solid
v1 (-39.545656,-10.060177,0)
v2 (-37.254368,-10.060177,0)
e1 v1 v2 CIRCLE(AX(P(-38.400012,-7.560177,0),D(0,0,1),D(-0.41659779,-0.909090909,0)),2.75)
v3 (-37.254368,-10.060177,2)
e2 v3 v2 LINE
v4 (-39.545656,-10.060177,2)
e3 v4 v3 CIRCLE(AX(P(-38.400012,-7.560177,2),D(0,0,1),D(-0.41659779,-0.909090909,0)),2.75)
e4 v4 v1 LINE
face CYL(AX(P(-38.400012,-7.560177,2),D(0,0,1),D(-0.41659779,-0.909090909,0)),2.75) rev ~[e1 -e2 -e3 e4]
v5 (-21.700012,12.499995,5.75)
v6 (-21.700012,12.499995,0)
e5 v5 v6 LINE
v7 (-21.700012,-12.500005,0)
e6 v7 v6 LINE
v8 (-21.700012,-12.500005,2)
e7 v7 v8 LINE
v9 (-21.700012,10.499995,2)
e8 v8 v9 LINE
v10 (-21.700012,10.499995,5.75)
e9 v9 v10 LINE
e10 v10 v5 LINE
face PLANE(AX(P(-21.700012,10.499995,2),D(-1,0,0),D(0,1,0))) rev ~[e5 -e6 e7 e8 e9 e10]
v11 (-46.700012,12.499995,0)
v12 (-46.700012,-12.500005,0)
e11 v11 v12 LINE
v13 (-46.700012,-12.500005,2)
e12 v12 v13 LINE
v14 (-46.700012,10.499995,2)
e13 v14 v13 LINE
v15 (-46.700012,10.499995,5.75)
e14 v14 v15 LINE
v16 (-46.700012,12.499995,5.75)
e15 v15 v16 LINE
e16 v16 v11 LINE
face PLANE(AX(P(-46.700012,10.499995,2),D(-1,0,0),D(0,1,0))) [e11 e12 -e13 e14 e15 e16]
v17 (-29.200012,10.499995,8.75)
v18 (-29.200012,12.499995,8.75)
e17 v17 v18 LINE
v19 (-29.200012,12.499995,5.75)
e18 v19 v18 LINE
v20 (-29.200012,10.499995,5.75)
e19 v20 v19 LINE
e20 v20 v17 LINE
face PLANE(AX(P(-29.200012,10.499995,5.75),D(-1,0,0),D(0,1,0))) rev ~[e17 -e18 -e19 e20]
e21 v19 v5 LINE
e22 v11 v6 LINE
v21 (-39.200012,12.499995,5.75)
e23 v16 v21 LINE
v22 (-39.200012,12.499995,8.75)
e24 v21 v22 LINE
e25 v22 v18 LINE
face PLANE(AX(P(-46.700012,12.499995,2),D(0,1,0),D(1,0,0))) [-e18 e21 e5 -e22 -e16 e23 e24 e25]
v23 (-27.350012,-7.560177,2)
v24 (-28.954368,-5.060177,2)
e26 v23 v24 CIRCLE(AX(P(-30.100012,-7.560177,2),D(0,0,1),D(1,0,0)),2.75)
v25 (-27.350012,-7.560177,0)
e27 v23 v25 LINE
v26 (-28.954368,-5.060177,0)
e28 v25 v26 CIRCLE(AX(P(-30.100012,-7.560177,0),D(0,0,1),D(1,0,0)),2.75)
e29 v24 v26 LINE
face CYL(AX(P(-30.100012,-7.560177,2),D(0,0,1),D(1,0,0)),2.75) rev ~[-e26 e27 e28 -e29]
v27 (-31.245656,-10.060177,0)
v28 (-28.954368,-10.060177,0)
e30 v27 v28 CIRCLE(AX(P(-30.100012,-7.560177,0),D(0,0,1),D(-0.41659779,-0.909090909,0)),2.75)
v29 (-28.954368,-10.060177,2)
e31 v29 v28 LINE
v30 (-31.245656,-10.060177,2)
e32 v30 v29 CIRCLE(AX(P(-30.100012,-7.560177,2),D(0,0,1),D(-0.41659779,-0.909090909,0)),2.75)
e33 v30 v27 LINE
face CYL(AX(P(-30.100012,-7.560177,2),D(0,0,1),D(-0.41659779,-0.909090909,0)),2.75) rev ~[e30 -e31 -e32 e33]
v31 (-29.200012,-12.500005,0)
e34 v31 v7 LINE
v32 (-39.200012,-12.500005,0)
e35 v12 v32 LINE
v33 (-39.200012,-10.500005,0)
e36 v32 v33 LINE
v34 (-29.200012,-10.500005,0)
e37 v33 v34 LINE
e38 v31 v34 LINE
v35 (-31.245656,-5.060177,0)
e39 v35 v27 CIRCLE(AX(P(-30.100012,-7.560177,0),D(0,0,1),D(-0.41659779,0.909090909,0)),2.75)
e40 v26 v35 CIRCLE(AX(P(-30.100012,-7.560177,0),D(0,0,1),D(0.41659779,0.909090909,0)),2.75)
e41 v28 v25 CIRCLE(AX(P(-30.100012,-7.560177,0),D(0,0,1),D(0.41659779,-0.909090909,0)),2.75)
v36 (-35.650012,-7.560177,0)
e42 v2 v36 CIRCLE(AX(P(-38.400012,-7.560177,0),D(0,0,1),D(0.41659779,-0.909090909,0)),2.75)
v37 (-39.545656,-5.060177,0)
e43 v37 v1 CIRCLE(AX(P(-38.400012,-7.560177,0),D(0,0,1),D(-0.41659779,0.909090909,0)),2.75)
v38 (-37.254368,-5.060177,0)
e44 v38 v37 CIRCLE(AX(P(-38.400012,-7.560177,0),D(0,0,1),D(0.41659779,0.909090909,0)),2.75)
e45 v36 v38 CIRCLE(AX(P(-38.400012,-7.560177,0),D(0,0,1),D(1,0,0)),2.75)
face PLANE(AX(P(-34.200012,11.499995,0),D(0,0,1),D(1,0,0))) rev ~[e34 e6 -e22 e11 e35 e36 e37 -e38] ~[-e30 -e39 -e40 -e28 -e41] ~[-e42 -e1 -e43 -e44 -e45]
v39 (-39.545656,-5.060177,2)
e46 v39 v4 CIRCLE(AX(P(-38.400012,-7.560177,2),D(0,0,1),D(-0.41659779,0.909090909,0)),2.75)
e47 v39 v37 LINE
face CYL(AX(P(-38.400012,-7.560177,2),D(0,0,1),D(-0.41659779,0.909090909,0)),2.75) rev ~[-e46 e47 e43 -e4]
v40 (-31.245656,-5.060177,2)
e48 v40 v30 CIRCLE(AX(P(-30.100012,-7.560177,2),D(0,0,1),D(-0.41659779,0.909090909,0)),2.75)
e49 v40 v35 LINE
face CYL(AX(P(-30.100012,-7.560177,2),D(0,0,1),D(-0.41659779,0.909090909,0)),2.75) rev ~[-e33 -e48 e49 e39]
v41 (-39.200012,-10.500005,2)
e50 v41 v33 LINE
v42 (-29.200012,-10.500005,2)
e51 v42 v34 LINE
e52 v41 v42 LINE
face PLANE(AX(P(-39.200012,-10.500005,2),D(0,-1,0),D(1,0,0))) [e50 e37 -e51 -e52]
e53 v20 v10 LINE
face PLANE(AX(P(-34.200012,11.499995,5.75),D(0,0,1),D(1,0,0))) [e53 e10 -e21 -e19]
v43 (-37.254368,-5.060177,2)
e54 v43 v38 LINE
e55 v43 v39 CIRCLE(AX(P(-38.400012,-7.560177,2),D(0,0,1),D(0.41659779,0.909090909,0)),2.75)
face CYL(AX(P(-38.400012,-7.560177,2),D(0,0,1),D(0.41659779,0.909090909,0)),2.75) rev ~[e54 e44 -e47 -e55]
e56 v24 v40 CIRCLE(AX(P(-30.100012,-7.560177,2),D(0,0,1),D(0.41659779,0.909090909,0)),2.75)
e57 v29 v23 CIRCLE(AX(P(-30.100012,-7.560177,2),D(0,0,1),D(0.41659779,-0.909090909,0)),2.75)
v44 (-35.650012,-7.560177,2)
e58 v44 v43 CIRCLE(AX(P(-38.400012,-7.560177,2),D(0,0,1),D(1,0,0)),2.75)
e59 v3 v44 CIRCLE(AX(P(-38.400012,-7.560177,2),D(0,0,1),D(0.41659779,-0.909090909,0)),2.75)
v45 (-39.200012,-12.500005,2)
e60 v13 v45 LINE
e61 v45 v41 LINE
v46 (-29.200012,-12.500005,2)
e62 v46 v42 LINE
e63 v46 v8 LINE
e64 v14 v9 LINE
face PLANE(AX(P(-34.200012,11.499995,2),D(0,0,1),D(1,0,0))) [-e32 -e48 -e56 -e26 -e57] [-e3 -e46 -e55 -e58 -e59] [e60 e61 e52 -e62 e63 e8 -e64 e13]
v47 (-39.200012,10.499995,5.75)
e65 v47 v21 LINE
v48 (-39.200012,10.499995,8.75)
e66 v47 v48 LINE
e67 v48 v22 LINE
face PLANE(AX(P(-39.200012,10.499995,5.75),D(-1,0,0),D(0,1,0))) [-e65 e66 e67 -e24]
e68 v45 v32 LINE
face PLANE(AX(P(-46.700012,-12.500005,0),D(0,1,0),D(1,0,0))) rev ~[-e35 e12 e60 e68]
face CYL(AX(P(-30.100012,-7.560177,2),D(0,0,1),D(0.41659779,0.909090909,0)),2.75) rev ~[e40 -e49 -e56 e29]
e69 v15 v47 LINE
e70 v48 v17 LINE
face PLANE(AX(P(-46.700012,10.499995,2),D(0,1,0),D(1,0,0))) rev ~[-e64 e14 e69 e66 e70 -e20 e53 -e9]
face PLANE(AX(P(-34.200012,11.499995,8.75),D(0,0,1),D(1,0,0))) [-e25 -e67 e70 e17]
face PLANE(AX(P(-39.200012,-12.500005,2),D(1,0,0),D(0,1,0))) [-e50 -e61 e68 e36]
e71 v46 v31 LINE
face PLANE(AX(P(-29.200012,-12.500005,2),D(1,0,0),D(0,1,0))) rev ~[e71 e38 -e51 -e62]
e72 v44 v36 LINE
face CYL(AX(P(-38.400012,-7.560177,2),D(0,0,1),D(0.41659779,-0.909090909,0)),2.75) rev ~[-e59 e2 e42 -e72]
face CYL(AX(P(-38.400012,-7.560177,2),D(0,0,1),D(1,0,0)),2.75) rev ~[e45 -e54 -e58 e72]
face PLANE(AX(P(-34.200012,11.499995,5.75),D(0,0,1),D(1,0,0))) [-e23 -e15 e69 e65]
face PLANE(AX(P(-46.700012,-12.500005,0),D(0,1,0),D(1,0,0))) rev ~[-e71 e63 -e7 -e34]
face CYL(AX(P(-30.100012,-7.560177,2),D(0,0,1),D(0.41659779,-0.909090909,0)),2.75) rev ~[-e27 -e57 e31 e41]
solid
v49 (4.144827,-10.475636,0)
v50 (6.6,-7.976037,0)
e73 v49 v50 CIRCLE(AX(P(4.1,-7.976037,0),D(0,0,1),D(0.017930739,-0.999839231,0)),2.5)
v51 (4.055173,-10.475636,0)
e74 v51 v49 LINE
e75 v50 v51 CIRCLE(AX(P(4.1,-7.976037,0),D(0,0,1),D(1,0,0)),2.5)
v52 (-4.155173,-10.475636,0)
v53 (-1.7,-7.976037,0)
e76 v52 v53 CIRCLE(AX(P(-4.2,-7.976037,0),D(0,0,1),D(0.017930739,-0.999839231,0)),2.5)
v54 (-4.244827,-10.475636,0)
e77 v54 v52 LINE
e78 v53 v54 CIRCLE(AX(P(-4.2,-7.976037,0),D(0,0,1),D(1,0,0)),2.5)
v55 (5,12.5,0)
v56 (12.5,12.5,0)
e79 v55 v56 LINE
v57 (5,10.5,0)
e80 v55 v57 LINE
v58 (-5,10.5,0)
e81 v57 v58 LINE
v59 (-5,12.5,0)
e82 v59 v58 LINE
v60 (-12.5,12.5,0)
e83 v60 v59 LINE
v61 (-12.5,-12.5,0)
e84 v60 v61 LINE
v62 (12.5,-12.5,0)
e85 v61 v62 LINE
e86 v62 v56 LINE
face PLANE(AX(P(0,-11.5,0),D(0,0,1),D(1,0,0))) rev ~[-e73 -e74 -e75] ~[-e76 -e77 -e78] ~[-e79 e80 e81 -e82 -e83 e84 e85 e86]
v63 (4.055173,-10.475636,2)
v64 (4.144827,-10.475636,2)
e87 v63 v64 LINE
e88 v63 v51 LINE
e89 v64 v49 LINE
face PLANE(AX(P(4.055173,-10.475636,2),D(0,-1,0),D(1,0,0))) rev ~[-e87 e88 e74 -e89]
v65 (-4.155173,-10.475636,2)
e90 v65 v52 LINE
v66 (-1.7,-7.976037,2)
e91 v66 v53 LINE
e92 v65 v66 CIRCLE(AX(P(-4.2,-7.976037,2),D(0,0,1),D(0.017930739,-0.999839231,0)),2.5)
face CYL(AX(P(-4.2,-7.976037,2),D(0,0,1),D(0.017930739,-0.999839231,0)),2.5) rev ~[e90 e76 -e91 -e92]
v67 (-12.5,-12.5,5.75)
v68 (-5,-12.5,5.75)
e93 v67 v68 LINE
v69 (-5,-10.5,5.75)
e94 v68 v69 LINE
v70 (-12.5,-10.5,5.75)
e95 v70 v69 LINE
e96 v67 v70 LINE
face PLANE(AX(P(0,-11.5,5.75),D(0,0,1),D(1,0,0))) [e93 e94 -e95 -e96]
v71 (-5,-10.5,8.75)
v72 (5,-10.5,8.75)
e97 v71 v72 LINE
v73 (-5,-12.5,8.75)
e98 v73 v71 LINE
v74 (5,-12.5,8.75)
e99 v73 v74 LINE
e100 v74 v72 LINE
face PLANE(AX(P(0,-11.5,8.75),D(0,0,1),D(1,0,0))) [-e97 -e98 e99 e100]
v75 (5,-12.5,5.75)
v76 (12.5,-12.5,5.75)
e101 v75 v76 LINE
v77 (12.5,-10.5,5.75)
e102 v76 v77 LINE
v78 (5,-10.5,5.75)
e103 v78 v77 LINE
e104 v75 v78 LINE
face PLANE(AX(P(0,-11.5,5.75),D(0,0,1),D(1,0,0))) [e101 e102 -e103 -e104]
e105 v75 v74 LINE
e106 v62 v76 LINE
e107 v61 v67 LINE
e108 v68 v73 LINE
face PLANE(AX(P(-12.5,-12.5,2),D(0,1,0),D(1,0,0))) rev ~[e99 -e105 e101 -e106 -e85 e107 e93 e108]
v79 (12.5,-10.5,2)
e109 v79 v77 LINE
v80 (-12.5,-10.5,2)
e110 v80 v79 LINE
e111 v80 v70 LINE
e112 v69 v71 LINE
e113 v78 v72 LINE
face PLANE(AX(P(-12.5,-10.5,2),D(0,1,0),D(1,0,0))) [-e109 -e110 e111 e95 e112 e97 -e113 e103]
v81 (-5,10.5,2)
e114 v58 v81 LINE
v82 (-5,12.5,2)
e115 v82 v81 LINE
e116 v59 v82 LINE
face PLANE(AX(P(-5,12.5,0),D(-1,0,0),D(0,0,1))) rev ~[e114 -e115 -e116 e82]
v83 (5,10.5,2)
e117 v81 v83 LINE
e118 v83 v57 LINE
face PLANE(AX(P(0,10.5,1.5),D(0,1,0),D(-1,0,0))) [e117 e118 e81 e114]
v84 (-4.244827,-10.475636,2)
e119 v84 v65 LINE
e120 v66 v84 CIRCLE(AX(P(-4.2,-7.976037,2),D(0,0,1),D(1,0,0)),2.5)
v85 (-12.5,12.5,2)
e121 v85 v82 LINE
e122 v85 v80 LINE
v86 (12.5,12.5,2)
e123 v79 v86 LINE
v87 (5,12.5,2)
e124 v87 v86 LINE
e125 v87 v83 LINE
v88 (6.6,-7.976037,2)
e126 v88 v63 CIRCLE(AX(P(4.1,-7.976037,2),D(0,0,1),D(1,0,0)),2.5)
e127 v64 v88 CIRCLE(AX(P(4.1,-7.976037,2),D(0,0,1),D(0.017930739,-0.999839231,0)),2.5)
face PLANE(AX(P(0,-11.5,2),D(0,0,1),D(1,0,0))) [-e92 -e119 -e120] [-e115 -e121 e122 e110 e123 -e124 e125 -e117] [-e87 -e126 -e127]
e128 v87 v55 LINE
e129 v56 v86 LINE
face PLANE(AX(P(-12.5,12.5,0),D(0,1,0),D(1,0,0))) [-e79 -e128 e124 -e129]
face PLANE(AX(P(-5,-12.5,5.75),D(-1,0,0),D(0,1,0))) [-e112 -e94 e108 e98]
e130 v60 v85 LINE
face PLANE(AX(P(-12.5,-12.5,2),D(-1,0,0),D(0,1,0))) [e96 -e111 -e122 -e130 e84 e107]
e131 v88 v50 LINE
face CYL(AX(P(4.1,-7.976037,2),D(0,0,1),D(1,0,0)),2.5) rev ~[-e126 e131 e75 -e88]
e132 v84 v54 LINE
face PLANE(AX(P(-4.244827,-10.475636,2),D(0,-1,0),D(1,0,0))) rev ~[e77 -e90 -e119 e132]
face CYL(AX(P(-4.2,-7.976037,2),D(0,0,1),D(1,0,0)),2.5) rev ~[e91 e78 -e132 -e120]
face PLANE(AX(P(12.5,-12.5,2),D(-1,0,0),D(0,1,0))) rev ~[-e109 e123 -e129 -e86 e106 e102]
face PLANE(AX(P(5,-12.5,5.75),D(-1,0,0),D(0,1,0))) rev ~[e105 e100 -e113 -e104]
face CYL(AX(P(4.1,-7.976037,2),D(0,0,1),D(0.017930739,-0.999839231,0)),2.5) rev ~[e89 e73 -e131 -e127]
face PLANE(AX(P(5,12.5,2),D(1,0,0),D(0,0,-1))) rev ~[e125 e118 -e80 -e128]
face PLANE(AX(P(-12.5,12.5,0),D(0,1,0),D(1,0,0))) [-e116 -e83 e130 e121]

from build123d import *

# Parameters (mm, degrees)
F0_W      = 25
F0_H      = 2
F0_H_2    = 21
F1_DEPTH  = 2
F2_W      = 25
F2_H      = 2
F4_DEPTH  = 3.75
F3_W      = 25
F3_H      = 2
F5_W      = 10
F5_H      = 2
F7_DEPTH  = 2.001
F8_W      = 10
F8_H      = 2
F9_DEPTH  = 3
F10_W     = 10
F10_H     = 2
F11_DEPTH = 3
F13_DEPTH = 2
F15_DEPTH = 2.001
F17_DEPTH = 2.001


# Not quite as in the source:
# - a feature names something its author has since deleted; it is built from what else it names


with BuildPart() as f1:
    # F0 (on Top) → F1 (new body)
    with BuildSketch(Plane.XY):
        with Locations((-34.2000119388, 11.4999952018)):
            Rectangle(F0_W, F0_H)
        with Locations((-34.2000119388, -4.7982e-06)):
            Rectangle(F0_W, F0_H_2)
        with Locations((-34.2000119388, -11.5000047982)):
            Rectangle(F0_W, F0_H)
    extrude(amount=F1_DEPTH)

    # F2 (on face) → F4 (join)
    with BuildSketch(Plane.XY.offset(2)):
        with Locations((-34.2000119388, 11.4999952018)):
            Rectangle(F2_W, F2_H)
    extrude(amount=F4_DEPTH)

    # F5 (on face) → F7 (cut, through all)
    with BuildSketch(Plane.XY.offset(2)):
        with Locations((-34.2000119388, -11.5000047982)):
            Rectangle(F5_W, F5_H)
    extrude(amount=-F7_DEPTH, mode=Mode.SUBTRACT)

    # F8 (on face) → F9 (join)
    with BuildSketch(Plane.XY.offset(5.75)):
        with Locations((-34.2000119388, 11.4999952018)):
            Rectangle(F8_W, F8_H)
    extrude(amount=F9_DEPTH)

    # F16 (on face) → F17 (cut, through all)
    with BuildSketch(Plane.XY.offset(2)):
        with BuildLine():
            ThreePointArc((-39.5456558625, -5.0601771846), (-41.1500119388, -7.5601771846), (-39.5456558625, -10.0601771846))
            Line((-39.5456558625, -10.0601771846), (-37.2543680151, -10.0601771846))
            ThreePointArc((-37.2543680151, -10.0601771846), (-36.0855983208, -9.045434605), (-35.6500119388, -7.5601771846))
            ThreePointArc((-35.6500119388, -7.5601771846), (-36.0855983208, -6.0749197642), (-37.2543680151, -5.0601771846))
            Line((-37.2543680151, -5.0601771846), (-39.5456558625, -5.0601771846))
        make_face()
        with BuildLine():
            ThreePointArc((-37.2543680151, -5.0601771846), (-38.4000119388, -4.8101771846), (-39.5456558625, -5.0601771846))
            Line((-39.5456558625, -5.0601771846), (-37.2543680151, -5.0601771846))
        make_face()
        with BuildLine():
            Line((-37.2543680151, -10.0601771846), (-39.5456558625, -10.0601771846))
            ThreePointArc((-39.5456558625, -10.0601771846), (-38.4000119388, -10.3101771846), (-37.2543680151, -10.0601771846))
        make_face()
        with BuildLine():
            Line((-28.9543680151, -10.0601771846), (-31.2456558625, -10.0601771846))
            ThreePointArc((-31.2456558625, -10.0601771846), (-30.1000119388, -10.3101771846), (-28.9543680151, -10.0601771846))
        make_face()
        with BuildLine():
            ThreePointArc((-31.2456558625, -5.0601771846), (-32.8500119388, -7.5601771846), (-31.2456558625, -10.0601771846))
            Line((-31.2456558625, -10.0601771846), (-28.9543680151, -10.0601771846))
            ThreePointArc((-28.9543680151, -10.0601771846), (-27.7855983208, -9.045434605), (-27.3500119388, -7.5601771846))
            ThreePointArc((-27.3500119388, -7.5601771846), (-27.7855983208, -6.0749197642), (-28.9543680151, -5.0601771846))
            Line((-28.9543680151, -5.0601771846), (-31.2456558625, -5.0601771846))
        make_face()
        with BuildLine():
            ThreePointArc((-28.9543680151, -5.0601771846), (-30.1000119388, -4.8101771846), (-31.2456558625, -5.0601771846))
            Line((-31.2456558625, -5.0601771846), (-28.9543680151, -5.0601771846))
        make_face()
    extrude(amount=-F17_DEPTH, mode=Mode.SUBTRACT)


with BuildPart() as f1b:
    # F0 (on Top) → F1, piece 2 (new body)
    with BuildSketch(Plane.XY):
        with Locations((0, -11.5)):
            Rectangle(F0_W, F0_H)
        Rectangle(F0_W, F0_H_2)
        with Locations((0, 11.5)):
            Rectangle(F0_W, F0_H)
    extrude(amount=F1_DEPTH)

    # F3 (on face) → F4, piece 2 (join)
    with BuildSketch(Plane.XY.offset(2)):
        with Locations((0, -11.5)):
            Rectangle(F3_W, F3_H)
    extrude(amount=F4_DEPTH)

    # F10 (on face) → F11 (join)
    with BuildSketch(Plane.XY.offset(5.75)):
        with Locations((0, -11.5)):
            Rectangle(F10_W, F10_H)
    extrude(amount=F11_DEPTH)

    # F12 (on face) → F13 (cut)
    with BuildSketch(Plane(origin=(0, 12.5, 0), x_dir=(-1, 0, 0), z_dir=(0, 1, 0))):
        Polygon((-5, 2), (-5, 1), (0, 1), (5, 1), (5, 2), align=None)
        Polygon((0, 1), (-5, 1), (-5, 0), (5, 0), (5, 1), align=None)
    extrude(amount=-F13_DEPTH, mode=Mode.SUBTRACT)

    # F14 (on face) → F15 (cut, through all)
    with BuildSketch(Plane.XY.offset(2)):
        with BuildLine():
            Line((-4.2448268481, -10.4756355286), (-4.1551731519, -10.4756355286))
            ThreePointArc((-4.1551731519, -10.4756355286), (-2.4164547777, -9.7278840301), (-1.7, -7.9760374501))
            ThreePointArc((-1.7, -7.9760374501), (-5.95184658, -6.1924922278), (-4.2448268481, -10.4756355286))
        make_face()
        with BuildLine():
            Line((4.0551731519, -10.4756355286), (4.1448268481, -10.4756355286))
            ThreePointArc((4.1448268481, -10.4756355286), (5.8835452223, -9.7278840301), (6.6, -7.9760374501))
            ThreePointArc((6.6, -7.9760374501), (2.34815342, -6.1924922278), (4.0551731519, -10.4756355286))
        make_face()
    extrude(amount=-F15_DEPTH, mode=Mode.SUBTRACT)


solid = Compound([f1.part, f1b.part])
